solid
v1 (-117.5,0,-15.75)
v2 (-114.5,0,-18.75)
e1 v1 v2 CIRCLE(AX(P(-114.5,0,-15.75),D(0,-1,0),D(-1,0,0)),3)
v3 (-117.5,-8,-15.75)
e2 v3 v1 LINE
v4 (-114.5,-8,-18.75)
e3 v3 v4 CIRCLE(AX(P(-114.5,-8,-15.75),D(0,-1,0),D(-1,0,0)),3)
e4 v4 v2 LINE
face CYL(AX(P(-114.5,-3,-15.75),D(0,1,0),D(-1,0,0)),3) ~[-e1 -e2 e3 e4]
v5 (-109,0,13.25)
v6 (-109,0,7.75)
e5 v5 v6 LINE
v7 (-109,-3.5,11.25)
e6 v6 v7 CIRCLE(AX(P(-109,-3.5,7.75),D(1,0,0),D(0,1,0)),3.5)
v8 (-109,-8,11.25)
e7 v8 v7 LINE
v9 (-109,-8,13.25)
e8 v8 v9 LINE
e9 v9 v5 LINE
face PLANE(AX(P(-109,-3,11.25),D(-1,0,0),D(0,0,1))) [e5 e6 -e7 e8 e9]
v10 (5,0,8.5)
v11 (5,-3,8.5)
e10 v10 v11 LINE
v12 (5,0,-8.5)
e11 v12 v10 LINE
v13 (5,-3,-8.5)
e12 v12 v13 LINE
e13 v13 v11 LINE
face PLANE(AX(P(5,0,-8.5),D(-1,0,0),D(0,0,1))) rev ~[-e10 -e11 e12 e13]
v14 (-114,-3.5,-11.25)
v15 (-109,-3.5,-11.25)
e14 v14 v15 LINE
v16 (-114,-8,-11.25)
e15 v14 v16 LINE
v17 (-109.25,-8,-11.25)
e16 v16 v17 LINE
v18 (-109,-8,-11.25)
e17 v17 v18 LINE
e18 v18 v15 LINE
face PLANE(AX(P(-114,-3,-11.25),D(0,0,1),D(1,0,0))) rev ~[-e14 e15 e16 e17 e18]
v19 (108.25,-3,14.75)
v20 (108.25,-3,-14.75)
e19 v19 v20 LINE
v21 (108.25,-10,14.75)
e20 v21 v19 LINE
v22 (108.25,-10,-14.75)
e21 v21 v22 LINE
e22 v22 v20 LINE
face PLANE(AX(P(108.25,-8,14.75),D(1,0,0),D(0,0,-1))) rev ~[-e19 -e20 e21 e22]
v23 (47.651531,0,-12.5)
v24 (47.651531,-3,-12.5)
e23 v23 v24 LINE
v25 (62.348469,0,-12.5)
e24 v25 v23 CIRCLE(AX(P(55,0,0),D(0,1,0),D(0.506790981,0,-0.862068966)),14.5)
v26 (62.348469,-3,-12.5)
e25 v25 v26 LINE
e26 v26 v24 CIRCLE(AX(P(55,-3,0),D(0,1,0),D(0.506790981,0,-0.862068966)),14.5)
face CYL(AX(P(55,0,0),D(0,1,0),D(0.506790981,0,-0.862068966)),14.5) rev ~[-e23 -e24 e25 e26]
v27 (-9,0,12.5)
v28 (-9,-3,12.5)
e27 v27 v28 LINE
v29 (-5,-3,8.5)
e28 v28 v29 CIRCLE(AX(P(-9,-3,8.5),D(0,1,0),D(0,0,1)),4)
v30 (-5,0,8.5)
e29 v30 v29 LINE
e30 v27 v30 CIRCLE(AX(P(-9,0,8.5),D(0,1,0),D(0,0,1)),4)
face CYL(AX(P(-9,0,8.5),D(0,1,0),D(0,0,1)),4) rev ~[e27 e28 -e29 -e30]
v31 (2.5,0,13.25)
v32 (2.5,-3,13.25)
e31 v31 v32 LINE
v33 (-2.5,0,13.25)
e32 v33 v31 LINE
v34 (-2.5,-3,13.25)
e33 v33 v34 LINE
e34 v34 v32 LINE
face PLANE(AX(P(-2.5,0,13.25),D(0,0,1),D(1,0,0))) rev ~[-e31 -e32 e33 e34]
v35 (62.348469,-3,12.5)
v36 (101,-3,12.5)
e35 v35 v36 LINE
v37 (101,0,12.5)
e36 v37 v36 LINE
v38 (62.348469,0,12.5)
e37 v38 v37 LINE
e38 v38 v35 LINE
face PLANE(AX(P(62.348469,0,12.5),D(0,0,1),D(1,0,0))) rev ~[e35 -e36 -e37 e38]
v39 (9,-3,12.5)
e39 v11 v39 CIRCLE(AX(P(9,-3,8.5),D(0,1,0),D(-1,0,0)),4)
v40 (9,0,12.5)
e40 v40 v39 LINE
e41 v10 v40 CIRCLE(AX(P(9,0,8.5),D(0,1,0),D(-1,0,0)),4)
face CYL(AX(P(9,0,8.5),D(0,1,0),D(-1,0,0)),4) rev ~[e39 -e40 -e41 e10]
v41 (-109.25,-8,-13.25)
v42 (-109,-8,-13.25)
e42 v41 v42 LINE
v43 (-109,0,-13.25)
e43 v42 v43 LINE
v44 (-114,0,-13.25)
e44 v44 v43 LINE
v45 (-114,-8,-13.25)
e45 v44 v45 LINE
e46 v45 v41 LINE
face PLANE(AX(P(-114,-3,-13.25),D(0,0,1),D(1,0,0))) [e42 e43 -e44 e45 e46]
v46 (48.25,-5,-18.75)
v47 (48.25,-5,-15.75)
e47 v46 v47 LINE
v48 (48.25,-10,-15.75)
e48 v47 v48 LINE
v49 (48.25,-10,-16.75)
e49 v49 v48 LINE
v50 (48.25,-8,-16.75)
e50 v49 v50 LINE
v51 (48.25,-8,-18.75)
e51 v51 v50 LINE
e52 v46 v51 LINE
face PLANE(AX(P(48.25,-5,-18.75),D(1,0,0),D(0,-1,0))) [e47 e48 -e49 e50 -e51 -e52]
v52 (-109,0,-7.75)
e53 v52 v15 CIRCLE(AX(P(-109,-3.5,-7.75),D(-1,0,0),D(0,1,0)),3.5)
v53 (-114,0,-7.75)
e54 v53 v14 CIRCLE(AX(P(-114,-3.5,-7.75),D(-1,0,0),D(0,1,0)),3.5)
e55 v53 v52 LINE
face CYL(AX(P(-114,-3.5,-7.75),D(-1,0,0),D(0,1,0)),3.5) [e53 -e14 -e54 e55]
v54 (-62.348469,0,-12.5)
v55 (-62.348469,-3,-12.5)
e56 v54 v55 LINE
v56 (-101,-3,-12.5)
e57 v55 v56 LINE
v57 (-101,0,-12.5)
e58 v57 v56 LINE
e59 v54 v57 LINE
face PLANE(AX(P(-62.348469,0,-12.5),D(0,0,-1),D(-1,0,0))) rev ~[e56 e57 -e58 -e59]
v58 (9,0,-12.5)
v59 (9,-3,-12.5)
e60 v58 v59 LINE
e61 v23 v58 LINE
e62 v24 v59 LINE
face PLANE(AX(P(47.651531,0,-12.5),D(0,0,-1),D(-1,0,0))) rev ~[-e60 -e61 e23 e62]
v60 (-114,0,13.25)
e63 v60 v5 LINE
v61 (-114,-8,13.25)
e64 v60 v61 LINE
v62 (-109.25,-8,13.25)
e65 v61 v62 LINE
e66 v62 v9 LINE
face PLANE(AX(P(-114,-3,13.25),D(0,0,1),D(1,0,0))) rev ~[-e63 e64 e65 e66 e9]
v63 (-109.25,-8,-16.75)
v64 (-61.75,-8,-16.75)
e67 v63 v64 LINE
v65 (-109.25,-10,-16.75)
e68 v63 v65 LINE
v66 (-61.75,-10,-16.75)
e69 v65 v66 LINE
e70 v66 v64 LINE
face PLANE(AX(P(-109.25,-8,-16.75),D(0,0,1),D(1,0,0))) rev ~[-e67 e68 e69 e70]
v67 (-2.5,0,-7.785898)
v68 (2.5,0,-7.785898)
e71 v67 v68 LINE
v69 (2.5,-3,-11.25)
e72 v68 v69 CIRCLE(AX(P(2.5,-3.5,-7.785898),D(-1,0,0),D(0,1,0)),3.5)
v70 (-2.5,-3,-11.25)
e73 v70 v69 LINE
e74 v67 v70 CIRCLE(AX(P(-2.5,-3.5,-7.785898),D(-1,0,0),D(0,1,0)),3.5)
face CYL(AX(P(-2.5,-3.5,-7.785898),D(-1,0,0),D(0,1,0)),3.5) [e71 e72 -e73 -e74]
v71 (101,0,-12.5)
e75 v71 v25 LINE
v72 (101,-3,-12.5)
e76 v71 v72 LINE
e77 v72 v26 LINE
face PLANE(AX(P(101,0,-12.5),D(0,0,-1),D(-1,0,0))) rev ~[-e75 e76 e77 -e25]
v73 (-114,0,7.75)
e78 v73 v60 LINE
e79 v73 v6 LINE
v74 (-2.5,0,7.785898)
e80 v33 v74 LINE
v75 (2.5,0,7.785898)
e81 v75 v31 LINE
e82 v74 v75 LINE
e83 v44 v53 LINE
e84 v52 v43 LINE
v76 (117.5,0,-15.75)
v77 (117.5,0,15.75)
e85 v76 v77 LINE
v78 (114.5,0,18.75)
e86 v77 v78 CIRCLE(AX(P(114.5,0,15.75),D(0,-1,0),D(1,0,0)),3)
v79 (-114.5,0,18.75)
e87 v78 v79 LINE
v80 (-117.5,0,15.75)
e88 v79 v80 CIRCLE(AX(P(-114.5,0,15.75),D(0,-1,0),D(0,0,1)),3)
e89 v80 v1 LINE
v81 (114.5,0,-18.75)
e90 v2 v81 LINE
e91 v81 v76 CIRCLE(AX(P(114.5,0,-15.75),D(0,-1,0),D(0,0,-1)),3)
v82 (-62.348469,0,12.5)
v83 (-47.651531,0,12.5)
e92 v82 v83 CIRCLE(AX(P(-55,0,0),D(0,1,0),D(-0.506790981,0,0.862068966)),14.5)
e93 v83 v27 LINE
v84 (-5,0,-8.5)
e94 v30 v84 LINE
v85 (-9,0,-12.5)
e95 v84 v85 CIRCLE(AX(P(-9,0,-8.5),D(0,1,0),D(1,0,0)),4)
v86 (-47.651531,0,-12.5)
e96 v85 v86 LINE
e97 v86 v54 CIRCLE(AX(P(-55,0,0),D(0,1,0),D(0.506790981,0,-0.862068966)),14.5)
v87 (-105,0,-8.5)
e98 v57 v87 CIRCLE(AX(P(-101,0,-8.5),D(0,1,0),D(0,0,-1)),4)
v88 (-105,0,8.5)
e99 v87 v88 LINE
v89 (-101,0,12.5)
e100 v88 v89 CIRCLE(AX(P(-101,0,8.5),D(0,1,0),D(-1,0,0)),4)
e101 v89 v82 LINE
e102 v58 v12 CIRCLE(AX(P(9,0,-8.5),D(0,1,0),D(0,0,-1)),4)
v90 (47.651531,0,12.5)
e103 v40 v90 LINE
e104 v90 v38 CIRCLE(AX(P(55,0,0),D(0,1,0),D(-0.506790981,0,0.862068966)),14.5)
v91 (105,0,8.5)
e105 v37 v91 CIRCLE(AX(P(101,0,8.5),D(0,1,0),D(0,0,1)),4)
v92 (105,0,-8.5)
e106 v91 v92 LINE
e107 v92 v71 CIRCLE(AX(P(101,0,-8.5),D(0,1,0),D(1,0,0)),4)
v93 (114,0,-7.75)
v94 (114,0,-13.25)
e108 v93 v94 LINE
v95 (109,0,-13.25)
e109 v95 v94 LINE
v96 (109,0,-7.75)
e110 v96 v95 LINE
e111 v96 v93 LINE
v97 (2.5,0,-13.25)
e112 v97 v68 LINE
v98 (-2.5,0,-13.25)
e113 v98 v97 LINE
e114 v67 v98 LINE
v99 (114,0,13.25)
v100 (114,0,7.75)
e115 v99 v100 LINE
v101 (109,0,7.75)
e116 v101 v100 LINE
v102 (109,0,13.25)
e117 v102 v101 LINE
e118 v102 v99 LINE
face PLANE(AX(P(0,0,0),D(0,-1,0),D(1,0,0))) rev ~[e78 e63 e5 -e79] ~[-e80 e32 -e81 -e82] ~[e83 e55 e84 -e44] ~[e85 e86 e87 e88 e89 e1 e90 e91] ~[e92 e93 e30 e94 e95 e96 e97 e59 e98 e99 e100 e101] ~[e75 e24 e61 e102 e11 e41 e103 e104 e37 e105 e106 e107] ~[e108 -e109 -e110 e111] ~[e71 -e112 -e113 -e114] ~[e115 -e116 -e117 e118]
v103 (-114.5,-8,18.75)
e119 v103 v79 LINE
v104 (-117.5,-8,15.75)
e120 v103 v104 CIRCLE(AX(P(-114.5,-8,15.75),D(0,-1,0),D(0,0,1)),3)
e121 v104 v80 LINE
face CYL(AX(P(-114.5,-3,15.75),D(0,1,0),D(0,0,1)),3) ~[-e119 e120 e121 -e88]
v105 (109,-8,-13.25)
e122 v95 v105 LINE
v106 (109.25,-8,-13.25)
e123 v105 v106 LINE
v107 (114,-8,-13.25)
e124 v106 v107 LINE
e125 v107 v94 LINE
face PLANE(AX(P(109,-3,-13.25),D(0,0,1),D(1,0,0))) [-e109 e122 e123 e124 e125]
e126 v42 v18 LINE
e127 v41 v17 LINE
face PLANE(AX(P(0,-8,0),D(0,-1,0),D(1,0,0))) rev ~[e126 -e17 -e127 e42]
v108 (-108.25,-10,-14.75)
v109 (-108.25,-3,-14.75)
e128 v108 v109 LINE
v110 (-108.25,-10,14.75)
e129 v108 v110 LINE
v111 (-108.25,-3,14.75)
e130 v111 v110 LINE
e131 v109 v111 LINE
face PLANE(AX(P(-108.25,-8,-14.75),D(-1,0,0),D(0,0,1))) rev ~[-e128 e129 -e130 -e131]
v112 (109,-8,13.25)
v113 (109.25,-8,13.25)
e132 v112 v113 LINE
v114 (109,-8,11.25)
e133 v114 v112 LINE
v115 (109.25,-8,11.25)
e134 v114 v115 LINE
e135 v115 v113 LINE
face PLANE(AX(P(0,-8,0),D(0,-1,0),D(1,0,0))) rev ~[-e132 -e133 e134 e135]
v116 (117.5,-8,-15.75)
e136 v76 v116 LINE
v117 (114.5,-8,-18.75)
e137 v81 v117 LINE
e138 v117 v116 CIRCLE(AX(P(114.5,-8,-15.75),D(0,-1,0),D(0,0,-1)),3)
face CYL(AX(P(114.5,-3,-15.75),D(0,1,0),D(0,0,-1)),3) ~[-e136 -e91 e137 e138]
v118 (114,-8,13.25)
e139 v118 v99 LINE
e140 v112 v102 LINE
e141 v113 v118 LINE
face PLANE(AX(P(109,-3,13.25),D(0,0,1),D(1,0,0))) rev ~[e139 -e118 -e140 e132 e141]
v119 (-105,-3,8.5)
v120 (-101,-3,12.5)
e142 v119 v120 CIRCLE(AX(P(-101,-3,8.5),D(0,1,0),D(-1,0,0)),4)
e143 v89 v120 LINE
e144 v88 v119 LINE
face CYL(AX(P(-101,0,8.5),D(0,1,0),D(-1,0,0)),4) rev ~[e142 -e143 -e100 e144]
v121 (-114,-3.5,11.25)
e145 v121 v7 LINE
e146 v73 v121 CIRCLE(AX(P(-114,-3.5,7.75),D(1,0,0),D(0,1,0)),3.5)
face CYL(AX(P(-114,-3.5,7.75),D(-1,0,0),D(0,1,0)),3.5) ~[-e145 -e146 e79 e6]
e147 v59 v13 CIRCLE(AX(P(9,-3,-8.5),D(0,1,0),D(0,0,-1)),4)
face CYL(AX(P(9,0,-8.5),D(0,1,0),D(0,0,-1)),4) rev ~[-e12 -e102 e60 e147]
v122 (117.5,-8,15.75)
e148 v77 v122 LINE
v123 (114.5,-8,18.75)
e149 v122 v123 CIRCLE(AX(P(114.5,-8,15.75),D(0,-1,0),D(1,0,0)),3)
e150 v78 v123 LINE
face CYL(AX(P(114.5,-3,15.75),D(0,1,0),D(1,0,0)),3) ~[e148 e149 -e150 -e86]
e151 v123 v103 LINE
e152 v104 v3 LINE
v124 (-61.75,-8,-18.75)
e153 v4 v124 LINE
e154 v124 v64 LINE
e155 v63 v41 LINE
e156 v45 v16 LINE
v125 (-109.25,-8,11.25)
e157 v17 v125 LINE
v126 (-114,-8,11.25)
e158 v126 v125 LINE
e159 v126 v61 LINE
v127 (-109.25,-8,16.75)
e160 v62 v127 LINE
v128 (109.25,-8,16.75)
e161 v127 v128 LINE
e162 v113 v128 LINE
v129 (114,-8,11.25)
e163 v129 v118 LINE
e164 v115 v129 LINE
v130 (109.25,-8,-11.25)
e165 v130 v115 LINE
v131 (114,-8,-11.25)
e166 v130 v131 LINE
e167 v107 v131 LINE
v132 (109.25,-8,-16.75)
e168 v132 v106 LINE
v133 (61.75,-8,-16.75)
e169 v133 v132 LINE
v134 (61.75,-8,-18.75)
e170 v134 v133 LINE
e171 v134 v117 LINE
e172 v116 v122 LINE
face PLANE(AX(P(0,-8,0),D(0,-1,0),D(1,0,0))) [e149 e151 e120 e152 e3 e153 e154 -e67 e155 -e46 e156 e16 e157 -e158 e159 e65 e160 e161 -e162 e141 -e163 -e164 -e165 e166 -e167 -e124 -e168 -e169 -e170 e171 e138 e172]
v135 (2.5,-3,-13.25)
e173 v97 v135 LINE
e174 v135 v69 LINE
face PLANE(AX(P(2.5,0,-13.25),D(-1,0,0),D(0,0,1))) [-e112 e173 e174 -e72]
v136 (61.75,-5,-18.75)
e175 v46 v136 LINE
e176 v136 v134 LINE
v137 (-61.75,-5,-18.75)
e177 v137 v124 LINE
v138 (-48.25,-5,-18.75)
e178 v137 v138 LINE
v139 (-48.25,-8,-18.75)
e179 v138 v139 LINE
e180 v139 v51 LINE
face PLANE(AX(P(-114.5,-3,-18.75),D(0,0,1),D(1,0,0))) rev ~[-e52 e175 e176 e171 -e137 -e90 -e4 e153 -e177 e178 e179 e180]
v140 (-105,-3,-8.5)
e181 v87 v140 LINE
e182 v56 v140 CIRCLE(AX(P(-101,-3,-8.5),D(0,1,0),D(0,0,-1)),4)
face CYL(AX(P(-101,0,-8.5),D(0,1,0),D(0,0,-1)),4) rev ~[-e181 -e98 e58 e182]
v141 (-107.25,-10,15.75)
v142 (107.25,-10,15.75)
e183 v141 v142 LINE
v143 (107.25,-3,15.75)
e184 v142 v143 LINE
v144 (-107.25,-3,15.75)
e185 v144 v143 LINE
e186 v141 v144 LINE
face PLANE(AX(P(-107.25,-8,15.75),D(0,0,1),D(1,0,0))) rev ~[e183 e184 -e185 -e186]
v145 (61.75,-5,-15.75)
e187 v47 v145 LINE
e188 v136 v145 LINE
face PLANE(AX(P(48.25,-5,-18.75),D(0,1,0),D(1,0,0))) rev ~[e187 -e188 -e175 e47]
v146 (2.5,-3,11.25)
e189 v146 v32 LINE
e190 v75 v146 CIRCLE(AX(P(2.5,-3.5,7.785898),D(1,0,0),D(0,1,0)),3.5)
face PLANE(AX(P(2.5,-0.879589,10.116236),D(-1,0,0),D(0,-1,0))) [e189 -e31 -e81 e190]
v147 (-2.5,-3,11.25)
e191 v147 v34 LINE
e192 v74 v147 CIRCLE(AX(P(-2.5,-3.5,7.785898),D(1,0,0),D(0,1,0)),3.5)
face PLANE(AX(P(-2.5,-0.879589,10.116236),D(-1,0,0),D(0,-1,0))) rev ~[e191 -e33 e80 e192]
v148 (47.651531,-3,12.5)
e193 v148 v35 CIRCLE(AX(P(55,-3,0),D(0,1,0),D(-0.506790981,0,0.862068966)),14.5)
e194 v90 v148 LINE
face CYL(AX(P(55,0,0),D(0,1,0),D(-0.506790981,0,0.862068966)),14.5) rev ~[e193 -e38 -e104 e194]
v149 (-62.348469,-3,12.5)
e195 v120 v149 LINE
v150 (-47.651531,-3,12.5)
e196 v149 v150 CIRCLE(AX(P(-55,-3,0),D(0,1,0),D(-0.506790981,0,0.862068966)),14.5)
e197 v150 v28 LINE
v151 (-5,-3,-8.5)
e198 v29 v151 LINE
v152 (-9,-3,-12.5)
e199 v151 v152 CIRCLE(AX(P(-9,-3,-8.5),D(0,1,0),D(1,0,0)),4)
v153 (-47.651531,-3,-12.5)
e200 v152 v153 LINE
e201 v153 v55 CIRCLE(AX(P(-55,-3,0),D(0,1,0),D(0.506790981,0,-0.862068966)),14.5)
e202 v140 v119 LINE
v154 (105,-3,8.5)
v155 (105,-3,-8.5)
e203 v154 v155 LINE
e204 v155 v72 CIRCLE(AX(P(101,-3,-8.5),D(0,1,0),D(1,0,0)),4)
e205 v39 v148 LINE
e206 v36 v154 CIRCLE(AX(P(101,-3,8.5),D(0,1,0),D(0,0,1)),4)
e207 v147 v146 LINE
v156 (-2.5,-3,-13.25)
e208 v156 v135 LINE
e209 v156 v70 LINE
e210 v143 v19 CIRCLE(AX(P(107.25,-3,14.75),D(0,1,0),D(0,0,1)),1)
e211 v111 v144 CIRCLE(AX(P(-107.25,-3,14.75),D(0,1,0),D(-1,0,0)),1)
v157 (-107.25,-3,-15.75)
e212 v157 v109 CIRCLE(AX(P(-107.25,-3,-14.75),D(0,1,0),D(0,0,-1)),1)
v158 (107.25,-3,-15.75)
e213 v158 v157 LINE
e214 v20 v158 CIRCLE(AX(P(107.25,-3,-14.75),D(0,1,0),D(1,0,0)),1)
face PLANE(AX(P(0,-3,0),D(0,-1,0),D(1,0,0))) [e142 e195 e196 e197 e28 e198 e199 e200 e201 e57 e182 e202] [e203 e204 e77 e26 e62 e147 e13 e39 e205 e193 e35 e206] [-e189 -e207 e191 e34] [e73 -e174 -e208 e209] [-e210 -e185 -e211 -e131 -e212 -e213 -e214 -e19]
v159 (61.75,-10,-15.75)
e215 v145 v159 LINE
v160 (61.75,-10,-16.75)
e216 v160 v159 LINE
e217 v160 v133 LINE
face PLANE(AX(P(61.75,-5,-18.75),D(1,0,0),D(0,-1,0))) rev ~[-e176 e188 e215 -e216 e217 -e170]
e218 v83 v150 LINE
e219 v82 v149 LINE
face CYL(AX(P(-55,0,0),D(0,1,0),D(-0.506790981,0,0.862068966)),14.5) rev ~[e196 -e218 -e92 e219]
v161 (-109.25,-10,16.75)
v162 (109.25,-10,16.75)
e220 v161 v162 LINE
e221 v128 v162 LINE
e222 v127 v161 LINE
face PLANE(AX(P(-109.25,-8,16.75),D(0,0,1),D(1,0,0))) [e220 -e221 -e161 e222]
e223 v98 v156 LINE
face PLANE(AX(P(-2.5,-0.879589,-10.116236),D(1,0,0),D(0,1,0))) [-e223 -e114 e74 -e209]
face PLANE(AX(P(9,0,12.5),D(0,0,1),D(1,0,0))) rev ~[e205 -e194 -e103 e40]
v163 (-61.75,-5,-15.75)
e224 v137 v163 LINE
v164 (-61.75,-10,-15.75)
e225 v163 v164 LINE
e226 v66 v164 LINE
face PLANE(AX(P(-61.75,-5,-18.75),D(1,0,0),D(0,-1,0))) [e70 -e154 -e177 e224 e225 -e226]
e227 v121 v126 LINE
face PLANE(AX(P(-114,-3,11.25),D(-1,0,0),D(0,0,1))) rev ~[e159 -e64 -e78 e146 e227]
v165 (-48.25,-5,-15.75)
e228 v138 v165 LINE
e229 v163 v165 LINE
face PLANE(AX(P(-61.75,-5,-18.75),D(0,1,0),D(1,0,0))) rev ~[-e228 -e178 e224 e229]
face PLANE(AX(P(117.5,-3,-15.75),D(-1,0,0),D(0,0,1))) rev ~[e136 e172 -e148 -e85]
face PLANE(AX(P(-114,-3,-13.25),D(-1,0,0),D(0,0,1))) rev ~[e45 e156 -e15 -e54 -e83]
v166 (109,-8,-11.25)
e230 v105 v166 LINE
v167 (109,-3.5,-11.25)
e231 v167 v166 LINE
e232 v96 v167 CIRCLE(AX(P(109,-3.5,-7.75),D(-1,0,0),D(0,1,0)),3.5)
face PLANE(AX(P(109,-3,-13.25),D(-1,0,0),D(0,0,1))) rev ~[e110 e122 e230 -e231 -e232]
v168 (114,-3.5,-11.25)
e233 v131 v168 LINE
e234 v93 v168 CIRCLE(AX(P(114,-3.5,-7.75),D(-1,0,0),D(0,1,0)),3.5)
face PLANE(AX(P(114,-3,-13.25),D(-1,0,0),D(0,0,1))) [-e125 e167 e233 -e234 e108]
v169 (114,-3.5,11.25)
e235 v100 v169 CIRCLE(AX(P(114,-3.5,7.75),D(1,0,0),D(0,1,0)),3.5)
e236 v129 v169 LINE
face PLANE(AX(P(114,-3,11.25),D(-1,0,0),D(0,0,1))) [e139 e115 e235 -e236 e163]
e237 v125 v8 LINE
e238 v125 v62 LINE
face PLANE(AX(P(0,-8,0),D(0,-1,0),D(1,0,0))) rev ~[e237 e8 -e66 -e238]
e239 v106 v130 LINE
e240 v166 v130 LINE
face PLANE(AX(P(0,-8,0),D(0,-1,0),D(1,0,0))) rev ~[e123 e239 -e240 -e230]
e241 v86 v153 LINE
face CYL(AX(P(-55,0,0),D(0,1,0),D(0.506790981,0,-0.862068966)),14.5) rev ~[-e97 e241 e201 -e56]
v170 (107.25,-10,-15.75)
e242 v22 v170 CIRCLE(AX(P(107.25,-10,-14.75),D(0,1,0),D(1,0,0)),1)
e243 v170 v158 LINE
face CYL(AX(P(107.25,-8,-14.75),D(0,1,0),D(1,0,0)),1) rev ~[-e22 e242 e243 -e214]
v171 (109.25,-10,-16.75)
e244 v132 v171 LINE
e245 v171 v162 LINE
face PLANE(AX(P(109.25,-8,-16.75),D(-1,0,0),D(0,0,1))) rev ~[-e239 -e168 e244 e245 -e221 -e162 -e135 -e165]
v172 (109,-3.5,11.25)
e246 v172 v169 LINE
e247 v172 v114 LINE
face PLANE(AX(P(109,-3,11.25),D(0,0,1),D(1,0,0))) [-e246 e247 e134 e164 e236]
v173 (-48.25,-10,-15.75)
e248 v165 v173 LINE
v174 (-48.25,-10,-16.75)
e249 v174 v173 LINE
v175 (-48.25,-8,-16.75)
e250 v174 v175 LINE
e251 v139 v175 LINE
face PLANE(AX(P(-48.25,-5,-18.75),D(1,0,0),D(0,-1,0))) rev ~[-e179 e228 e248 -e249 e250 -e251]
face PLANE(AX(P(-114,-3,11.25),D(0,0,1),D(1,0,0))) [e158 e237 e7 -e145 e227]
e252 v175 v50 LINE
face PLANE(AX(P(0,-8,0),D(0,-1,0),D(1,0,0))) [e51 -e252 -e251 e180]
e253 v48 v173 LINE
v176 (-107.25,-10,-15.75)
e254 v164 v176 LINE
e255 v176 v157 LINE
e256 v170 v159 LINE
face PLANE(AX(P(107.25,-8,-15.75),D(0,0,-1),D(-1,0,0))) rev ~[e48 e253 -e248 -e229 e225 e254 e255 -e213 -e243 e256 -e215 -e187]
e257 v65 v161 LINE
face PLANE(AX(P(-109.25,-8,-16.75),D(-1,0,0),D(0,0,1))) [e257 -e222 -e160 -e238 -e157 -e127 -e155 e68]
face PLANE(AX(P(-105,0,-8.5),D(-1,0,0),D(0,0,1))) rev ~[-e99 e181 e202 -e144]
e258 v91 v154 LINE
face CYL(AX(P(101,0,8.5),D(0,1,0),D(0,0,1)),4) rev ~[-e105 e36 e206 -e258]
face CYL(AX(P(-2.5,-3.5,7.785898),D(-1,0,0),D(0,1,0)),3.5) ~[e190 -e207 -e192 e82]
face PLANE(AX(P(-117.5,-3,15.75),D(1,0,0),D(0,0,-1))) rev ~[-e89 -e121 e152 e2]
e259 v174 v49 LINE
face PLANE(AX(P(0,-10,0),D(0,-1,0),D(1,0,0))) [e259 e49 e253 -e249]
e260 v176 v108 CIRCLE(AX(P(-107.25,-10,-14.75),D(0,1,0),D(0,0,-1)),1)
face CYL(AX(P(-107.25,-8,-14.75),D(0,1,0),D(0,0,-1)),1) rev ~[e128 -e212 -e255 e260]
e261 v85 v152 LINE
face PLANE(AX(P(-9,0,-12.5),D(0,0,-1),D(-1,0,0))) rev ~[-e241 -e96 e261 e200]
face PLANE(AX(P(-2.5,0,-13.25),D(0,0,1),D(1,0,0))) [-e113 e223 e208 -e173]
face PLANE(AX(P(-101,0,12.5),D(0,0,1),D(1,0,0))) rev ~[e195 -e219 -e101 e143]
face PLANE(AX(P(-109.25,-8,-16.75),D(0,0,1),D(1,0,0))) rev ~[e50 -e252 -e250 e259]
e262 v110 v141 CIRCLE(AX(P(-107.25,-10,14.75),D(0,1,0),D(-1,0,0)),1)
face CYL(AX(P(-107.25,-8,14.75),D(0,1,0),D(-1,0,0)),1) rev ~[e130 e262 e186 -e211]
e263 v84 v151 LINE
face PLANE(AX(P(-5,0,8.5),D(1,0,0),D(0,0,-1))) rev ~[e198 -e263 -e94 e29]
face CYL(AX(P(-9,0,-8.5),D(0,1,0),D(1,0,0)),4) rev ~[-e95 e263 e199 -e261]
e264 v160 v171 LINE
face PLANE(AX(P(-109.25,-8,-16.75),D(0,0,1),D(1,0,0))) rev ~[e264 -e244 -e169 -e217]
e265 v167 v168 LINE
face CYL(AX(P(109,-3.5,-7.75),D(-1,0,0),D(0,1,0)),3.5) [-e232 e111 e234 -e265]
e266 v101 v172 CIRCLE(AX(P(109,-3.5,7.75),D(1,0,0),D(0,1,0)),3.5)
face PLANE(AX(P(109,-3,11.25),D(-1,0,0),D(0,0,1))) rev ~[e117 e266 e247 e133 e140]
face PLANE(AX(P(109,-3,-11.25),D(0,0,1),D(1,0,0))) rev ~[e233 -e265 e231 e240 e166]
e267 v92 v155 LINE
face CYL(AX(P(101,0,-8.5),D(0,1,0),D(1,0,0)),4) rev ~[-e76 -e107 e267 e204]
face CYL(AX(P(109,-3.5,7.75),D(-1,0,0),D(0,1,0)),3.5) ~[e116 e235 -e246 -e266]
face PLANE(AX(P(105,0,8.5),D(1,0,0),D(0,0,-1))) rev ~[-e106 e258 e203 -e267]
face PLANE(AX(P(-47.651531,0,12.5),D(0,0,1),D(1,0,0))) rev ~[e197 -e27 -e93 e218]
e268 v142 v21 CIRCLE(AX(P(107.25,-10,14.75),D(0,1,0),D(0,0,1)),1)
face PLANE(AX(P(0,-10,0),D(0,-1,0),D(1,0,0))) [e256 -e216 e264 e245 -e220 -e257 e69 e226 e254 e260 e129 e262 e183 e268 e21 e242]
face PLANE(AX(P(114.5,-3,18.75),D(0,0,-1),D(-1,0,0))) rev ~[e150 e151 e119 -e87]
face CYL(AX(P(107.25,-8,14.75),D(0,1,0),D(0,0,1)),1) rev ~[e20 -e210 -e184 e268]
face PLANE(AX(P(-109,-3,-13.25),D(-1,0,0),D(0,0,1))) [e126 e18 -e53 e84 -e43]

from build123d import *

# Parameters (mm, degrees)
F0_W        = 5
F0_H        = 2
F1_DEPTH    = 3
F2_W        = 5
F2_H        = 2
F3_DEPTH    = 5
F4_W        = 218.5
F4_H        = 33.5
F5_DEPTH    = 2
F6_W        = 13.5
F6_H        = 5
F7_DEPTH    = 25
F8_T1_DEPTH = 5
F8_T3_DEPTH = 5
F8_T5_DEPTH = 5


# Not quite as in the source:
# - a fillet or chamfer that OpenCascade refuses, or shapes differently, is made with other operations: its cross-section is extruded or revolved along the edge and cut away or added
# - a feature names something its author has since deleted; it is built from what else it names


with BuildPart() as f1:
    # F0 (on Front) → F1 (new body)
    with BuildSketch(Plane.XZ):
        with BuildLine():
            ThreePointArc((117.5, 15.75), (116.6213203436, 17.8713203436), (114.5, 18.75))
            Line((114.5, 18.75), (-114.5, 18.75))
            ThreePointArc((-114.5, 18.75), (-116.6213203436, 17.8713203436), (-117.5, 15.75))
            Line((-117.5, 15.75), (-117.5, -15.75))
            ThreePointArc((-117.5, -15.75), (-116.6213203436, -17.8713203436), (-114.5, -18.75))
            Line((-114.5, -18.75), (114.5, -18.75))
            ThreePointArc((114.5, -18.75), (116.6213203436, -17.8713203436), (117.5, -15.75))
            Line((117.5, -15.75), (117.5, 15.75))
        make_face()
        with Locations((-111.5, -12.25)):
            Rectangle(F0_W, F0_H, mode=Mode.SUBTRACT)
        with BuildLine():
            Line((-47.6515307717, 12.5), (-9, 12.5))
            ThreePointArc((-9, 12.5), (-6.1715728753, 11.3284271247), (-5, 8.5))
            Line((-5, 8.5), (-5, -8.5))
            ThreePointArc((-5, -8.5), (-6.1715728753, -11.3284271247), (-9, -12.5))
            Line((-9, -12.5), (-47.6515307717, -12.5))
            ThreePointArc((-47.6515307717, -12.5), (-55, -14.5), (-62.3484692283, -12.5))
            Line((-62.3484692284, -12.5), (-101, -12.5))
            ThreePointArc((-101, -12.5), (-103.8284271247, -11.3284271247), (-105, -8.5))
            Line((-105, -8.5), (-105, 8.5))
            ThreePointArc((-105, 8.5), (-103.8284271247, 11.3284271247), (-101, 12.5))
            Line((-101, 12.5), (-62.3484692284, 12.5))
            ThreePointArc((-62.3484692283, 12.5), (-55, 14.5), (-47.6515307717, 12.5))
        make_face(mode=Mode.SUBTRACT)
        with Locations((0, -12.25)):
            Rectangle(F0_W, F0_H, mode=Mode.SUBTRACT)
        with Locations((111.5, -12.25)):
            Rectangle(F0_W, F0_H, mode=Mode.SUBTRACT)
        with BuildLine():
            Line((62.3484692283, 12.5), (101, 12.5))
            ThreePointArc((101, 12.5), (103.8284271247, 11.3284271247), (105, 8.5))
            Line((105, 8.5), (105, -8.5))
            ThreePointArc((105, -8.5), (103.8284271247, -11.3284271247), (101, -12.5))
            Line((101, -12.5), (62.3484692283, -12.5))
            ThreePointArc((62.3484692283, -12.5), (55, -14.5), (47.6515307717, -12.5))
            Line((47.6515307716, -12.5), (9, -12.5))
            ThreePointArc((9, -12.5), (6.1715728753, -11.3284271247), (5, -8.5))
            Line((5, -8.5), (5, 8.5))
            ThreePointArc((5, 8.5), (6.1715728753, 11.3284271247), (9, 12.5))
            Line((9, 12.5), (47.6515307716, 12.5))
            ThreePointArc((47.6515307717, 12.5), (55, 14.5), (62.3484692283, 12.5))
        make_face(mode=Mode.SUBTRACT)
        with Locations((-111.5, 12.25)):
            Rectangle(F0_W, F0_H, mode=Mode.SUBTRACT)
        with Locations((0, 12.25)):
            Rectangle(F0_W, F0_H, mode=Mode.SUBTRACT)
        with Locations((111.5, 12.25)):
            Rectangle(F0_W, F0_H, mode=Mode.SUBTRACT)
    extrude(amount=F1_DEPTH)

    # F2 (on face) → F3 (join)
    with BuildSketch(Plane.XZ.offset(3)):
        with BuildLine():
            Line((-114.5, -18.75), (114.5, -18.75))
            ThreePointArc((114.5, -18.75), (116.6213203436, -17.8713203436), (117.5, -15.75))
            Line((117.5, -15.75), (117.5, 15.75))
            ThreePointArc((117.5, 15.75), (116.6213203436, 17.8713203436), (114.5, 18.75))
            Line((114.5, 18.75), (-114.5, 18.75))
            ThreePointArc((-114.5, 18.75), (-116.6213203436, 17.8713203436), (-117.5, 15.75))
            Line((-117.5, 15.75), (-117.5, -15.75))
            ThreePointArc((-117.5, -15.75), (-116.6213203436, -17.8713203436), (-114.5, -18.75))
        make_face()
        with Locations((-111.5, -12.25)):
            Rectangle(F2_W, F2_H, mode=Mode.SUBTRACT)
        with Locations((111.5, -12.25)):
            Rectangle(F2_W, F2_H, mode=Mode.SUBTRACT)
        with Locations((-111.5, 12.25)):
            Rectangle(F2_W, F2_H, mode=Mode.SUBTRACT)
        with BuildLine():
            Line((-107.25, 15.75), (107.25, 15.75))
            ThreePointArc((107.25, 15.75), (107.9571067812, 15.4571067812), (108.25, 14.75))
            Line((108.25, 14.75), (108.25, -14.75))
            ThreePointArc((108.25, -14.75), (107.9571067812, -15.4571067812), (107.25, -15.75))
            Line((107.25, -15.75), (-107.25, -15.75))
            ThreePointArc((-107.25, -15.75), (-107.9571067812, -15.4571067812), (-108.25, -14.75))
            Line((-108.25, -14.75), (-108.25, 14.75))
            ThreePointArc((-108.25, 14.75), (-107.9571067812, 15.4571067812), (-107.25, 15.75))
        make_face(mode=Mode.SUBTRACT)
        with Locations((111.5, 12.25)):
            Rectangle(F2_W, F2_H, mode=Mode.SUBTRACT)
    extrude(amount=F3_DEPTH)

    # F4 (on face) → F5 (join)
    with BuildSketch(Plane.XZ.offset(8)):
        Rectangle(F4_W, F4_H)
        with BuildLine():
            ThreePointArc((-108.25, 14.75), (-107.9571067812, 15.4571067812), (-107.25, 15.75))
            Line((-107.25, 15.75), (107.25, 15.75))
            ThreePointArc((107.25, 15.75), (107.9571067812, 15.4571067812), (108.25, 14.75))
            Line((108.25, 14.75), (108.25, -14.75))
            ThreePointArc((108.25, -14.75), (107.9571067812, -15.4571067812), (107.25, -15.75))
            Line((107.25, -15.75), (-107.25, -15.75))
            ThreePointArc((-107.25, -15.75), (-107.9571067812, -15.4571067812), (-108.25, -14.75))
            Line((-108.25, -14.75), (-108.25, 14.75))
        make_face(mode=Mode.SUBTRACT)
    extrude(amount=F5_DEPTH)

    # F6 (on face) → F7 (cut)
    with BuildSketch(Plane(origin=(0, 0, -18.75), x_dir=(1, 0, 0), z_dir=(0, 0, -1))):
        with Locations((-55, 7.5)):
            Rectangle(F6_W, F6_H)
        with Locations((55, 7.5)):
            Rectangle(F6_W, F6_H)
    extrude(amount=-F7_DEPTH, mode=Mode.SUBTRACT)

    # F8: fillet of radius 3.5 on 6 edges, made by hand

    # F8_s2 → F8_t1 (cut)
    with BuildSketch(Plane.YZ.offset(-2.5)):
        with BuildLine():
            ThreePointArc((0, 7.7858983849), (-0.8542486889, 10.0771862323), (-3, 11.25))
            Line((-3, 11.25), (0, 11.25))
            Line((0, 11.25), (0, 7.7858983849))
        make_face()
        with BuildLine():
            ThreePointArc((0, -7.7858983849), (-0.8542486889, -10.0771862323), (-3, -11.25))
            Line((-3, -11.25), (0, -11.25))
            Line((0, -11.25), (0, -7.7858983849))
        make_face()
    extrude(amount=F8_T1_DEPTH, mode=Mode.SUBTRACT)

    # F8_s4 → F8_t3 (cut)
    with BuildSketch(Plane.YZ.offset(109)):
        with BuildLine():
            ThreePointArc((0, 7.75), (-1.0251262658, 10.2248737342), (-3.5, 11.25))
            Line((-3.5, 11.25), (0, 11.25))
            Line((0, 11.25), (0, 7.75))
        make_face()
        with BuildLine():
            ThreePointArc((0, -7.75), (-1.0251262658, -10.2248737342), (-3.5, -11.25))
            Line((-3.5, -11.25), (0, -11.25))
            Line((0, -11.25), (0, -7.75))
        make_face()
    extrude(amount=F8_T3_DEPTH, mode=Mode.SUBTRACT)

    # F8_s6 → F8_t5 (cut)
    with BuildSketch(Plane.YZ.offset(-114)):
        with BuildLine():
            ThreePointArc((0, 7.75), (-1.0251262658, 10.2248737342), (-3.5, 11.25))
            Line((-3.5, 11.25), (0, 11.25))
            Line((0, 11.25), (0, 7.75))
        make_face()
        with BuildLine():
            ThreePointArc((0, -7.75), (-1.0251262658, -10.2248737342), (-3.5, -11.25))
            Line((-3.5, -11.25), (0, -11.25))
            Line((0, -11.25), (0, -7.75))
        make_face()
    extrude(amount=F8_T5_DEPTH, mode=Mode.SUBTRACT)


solid = f1.part
